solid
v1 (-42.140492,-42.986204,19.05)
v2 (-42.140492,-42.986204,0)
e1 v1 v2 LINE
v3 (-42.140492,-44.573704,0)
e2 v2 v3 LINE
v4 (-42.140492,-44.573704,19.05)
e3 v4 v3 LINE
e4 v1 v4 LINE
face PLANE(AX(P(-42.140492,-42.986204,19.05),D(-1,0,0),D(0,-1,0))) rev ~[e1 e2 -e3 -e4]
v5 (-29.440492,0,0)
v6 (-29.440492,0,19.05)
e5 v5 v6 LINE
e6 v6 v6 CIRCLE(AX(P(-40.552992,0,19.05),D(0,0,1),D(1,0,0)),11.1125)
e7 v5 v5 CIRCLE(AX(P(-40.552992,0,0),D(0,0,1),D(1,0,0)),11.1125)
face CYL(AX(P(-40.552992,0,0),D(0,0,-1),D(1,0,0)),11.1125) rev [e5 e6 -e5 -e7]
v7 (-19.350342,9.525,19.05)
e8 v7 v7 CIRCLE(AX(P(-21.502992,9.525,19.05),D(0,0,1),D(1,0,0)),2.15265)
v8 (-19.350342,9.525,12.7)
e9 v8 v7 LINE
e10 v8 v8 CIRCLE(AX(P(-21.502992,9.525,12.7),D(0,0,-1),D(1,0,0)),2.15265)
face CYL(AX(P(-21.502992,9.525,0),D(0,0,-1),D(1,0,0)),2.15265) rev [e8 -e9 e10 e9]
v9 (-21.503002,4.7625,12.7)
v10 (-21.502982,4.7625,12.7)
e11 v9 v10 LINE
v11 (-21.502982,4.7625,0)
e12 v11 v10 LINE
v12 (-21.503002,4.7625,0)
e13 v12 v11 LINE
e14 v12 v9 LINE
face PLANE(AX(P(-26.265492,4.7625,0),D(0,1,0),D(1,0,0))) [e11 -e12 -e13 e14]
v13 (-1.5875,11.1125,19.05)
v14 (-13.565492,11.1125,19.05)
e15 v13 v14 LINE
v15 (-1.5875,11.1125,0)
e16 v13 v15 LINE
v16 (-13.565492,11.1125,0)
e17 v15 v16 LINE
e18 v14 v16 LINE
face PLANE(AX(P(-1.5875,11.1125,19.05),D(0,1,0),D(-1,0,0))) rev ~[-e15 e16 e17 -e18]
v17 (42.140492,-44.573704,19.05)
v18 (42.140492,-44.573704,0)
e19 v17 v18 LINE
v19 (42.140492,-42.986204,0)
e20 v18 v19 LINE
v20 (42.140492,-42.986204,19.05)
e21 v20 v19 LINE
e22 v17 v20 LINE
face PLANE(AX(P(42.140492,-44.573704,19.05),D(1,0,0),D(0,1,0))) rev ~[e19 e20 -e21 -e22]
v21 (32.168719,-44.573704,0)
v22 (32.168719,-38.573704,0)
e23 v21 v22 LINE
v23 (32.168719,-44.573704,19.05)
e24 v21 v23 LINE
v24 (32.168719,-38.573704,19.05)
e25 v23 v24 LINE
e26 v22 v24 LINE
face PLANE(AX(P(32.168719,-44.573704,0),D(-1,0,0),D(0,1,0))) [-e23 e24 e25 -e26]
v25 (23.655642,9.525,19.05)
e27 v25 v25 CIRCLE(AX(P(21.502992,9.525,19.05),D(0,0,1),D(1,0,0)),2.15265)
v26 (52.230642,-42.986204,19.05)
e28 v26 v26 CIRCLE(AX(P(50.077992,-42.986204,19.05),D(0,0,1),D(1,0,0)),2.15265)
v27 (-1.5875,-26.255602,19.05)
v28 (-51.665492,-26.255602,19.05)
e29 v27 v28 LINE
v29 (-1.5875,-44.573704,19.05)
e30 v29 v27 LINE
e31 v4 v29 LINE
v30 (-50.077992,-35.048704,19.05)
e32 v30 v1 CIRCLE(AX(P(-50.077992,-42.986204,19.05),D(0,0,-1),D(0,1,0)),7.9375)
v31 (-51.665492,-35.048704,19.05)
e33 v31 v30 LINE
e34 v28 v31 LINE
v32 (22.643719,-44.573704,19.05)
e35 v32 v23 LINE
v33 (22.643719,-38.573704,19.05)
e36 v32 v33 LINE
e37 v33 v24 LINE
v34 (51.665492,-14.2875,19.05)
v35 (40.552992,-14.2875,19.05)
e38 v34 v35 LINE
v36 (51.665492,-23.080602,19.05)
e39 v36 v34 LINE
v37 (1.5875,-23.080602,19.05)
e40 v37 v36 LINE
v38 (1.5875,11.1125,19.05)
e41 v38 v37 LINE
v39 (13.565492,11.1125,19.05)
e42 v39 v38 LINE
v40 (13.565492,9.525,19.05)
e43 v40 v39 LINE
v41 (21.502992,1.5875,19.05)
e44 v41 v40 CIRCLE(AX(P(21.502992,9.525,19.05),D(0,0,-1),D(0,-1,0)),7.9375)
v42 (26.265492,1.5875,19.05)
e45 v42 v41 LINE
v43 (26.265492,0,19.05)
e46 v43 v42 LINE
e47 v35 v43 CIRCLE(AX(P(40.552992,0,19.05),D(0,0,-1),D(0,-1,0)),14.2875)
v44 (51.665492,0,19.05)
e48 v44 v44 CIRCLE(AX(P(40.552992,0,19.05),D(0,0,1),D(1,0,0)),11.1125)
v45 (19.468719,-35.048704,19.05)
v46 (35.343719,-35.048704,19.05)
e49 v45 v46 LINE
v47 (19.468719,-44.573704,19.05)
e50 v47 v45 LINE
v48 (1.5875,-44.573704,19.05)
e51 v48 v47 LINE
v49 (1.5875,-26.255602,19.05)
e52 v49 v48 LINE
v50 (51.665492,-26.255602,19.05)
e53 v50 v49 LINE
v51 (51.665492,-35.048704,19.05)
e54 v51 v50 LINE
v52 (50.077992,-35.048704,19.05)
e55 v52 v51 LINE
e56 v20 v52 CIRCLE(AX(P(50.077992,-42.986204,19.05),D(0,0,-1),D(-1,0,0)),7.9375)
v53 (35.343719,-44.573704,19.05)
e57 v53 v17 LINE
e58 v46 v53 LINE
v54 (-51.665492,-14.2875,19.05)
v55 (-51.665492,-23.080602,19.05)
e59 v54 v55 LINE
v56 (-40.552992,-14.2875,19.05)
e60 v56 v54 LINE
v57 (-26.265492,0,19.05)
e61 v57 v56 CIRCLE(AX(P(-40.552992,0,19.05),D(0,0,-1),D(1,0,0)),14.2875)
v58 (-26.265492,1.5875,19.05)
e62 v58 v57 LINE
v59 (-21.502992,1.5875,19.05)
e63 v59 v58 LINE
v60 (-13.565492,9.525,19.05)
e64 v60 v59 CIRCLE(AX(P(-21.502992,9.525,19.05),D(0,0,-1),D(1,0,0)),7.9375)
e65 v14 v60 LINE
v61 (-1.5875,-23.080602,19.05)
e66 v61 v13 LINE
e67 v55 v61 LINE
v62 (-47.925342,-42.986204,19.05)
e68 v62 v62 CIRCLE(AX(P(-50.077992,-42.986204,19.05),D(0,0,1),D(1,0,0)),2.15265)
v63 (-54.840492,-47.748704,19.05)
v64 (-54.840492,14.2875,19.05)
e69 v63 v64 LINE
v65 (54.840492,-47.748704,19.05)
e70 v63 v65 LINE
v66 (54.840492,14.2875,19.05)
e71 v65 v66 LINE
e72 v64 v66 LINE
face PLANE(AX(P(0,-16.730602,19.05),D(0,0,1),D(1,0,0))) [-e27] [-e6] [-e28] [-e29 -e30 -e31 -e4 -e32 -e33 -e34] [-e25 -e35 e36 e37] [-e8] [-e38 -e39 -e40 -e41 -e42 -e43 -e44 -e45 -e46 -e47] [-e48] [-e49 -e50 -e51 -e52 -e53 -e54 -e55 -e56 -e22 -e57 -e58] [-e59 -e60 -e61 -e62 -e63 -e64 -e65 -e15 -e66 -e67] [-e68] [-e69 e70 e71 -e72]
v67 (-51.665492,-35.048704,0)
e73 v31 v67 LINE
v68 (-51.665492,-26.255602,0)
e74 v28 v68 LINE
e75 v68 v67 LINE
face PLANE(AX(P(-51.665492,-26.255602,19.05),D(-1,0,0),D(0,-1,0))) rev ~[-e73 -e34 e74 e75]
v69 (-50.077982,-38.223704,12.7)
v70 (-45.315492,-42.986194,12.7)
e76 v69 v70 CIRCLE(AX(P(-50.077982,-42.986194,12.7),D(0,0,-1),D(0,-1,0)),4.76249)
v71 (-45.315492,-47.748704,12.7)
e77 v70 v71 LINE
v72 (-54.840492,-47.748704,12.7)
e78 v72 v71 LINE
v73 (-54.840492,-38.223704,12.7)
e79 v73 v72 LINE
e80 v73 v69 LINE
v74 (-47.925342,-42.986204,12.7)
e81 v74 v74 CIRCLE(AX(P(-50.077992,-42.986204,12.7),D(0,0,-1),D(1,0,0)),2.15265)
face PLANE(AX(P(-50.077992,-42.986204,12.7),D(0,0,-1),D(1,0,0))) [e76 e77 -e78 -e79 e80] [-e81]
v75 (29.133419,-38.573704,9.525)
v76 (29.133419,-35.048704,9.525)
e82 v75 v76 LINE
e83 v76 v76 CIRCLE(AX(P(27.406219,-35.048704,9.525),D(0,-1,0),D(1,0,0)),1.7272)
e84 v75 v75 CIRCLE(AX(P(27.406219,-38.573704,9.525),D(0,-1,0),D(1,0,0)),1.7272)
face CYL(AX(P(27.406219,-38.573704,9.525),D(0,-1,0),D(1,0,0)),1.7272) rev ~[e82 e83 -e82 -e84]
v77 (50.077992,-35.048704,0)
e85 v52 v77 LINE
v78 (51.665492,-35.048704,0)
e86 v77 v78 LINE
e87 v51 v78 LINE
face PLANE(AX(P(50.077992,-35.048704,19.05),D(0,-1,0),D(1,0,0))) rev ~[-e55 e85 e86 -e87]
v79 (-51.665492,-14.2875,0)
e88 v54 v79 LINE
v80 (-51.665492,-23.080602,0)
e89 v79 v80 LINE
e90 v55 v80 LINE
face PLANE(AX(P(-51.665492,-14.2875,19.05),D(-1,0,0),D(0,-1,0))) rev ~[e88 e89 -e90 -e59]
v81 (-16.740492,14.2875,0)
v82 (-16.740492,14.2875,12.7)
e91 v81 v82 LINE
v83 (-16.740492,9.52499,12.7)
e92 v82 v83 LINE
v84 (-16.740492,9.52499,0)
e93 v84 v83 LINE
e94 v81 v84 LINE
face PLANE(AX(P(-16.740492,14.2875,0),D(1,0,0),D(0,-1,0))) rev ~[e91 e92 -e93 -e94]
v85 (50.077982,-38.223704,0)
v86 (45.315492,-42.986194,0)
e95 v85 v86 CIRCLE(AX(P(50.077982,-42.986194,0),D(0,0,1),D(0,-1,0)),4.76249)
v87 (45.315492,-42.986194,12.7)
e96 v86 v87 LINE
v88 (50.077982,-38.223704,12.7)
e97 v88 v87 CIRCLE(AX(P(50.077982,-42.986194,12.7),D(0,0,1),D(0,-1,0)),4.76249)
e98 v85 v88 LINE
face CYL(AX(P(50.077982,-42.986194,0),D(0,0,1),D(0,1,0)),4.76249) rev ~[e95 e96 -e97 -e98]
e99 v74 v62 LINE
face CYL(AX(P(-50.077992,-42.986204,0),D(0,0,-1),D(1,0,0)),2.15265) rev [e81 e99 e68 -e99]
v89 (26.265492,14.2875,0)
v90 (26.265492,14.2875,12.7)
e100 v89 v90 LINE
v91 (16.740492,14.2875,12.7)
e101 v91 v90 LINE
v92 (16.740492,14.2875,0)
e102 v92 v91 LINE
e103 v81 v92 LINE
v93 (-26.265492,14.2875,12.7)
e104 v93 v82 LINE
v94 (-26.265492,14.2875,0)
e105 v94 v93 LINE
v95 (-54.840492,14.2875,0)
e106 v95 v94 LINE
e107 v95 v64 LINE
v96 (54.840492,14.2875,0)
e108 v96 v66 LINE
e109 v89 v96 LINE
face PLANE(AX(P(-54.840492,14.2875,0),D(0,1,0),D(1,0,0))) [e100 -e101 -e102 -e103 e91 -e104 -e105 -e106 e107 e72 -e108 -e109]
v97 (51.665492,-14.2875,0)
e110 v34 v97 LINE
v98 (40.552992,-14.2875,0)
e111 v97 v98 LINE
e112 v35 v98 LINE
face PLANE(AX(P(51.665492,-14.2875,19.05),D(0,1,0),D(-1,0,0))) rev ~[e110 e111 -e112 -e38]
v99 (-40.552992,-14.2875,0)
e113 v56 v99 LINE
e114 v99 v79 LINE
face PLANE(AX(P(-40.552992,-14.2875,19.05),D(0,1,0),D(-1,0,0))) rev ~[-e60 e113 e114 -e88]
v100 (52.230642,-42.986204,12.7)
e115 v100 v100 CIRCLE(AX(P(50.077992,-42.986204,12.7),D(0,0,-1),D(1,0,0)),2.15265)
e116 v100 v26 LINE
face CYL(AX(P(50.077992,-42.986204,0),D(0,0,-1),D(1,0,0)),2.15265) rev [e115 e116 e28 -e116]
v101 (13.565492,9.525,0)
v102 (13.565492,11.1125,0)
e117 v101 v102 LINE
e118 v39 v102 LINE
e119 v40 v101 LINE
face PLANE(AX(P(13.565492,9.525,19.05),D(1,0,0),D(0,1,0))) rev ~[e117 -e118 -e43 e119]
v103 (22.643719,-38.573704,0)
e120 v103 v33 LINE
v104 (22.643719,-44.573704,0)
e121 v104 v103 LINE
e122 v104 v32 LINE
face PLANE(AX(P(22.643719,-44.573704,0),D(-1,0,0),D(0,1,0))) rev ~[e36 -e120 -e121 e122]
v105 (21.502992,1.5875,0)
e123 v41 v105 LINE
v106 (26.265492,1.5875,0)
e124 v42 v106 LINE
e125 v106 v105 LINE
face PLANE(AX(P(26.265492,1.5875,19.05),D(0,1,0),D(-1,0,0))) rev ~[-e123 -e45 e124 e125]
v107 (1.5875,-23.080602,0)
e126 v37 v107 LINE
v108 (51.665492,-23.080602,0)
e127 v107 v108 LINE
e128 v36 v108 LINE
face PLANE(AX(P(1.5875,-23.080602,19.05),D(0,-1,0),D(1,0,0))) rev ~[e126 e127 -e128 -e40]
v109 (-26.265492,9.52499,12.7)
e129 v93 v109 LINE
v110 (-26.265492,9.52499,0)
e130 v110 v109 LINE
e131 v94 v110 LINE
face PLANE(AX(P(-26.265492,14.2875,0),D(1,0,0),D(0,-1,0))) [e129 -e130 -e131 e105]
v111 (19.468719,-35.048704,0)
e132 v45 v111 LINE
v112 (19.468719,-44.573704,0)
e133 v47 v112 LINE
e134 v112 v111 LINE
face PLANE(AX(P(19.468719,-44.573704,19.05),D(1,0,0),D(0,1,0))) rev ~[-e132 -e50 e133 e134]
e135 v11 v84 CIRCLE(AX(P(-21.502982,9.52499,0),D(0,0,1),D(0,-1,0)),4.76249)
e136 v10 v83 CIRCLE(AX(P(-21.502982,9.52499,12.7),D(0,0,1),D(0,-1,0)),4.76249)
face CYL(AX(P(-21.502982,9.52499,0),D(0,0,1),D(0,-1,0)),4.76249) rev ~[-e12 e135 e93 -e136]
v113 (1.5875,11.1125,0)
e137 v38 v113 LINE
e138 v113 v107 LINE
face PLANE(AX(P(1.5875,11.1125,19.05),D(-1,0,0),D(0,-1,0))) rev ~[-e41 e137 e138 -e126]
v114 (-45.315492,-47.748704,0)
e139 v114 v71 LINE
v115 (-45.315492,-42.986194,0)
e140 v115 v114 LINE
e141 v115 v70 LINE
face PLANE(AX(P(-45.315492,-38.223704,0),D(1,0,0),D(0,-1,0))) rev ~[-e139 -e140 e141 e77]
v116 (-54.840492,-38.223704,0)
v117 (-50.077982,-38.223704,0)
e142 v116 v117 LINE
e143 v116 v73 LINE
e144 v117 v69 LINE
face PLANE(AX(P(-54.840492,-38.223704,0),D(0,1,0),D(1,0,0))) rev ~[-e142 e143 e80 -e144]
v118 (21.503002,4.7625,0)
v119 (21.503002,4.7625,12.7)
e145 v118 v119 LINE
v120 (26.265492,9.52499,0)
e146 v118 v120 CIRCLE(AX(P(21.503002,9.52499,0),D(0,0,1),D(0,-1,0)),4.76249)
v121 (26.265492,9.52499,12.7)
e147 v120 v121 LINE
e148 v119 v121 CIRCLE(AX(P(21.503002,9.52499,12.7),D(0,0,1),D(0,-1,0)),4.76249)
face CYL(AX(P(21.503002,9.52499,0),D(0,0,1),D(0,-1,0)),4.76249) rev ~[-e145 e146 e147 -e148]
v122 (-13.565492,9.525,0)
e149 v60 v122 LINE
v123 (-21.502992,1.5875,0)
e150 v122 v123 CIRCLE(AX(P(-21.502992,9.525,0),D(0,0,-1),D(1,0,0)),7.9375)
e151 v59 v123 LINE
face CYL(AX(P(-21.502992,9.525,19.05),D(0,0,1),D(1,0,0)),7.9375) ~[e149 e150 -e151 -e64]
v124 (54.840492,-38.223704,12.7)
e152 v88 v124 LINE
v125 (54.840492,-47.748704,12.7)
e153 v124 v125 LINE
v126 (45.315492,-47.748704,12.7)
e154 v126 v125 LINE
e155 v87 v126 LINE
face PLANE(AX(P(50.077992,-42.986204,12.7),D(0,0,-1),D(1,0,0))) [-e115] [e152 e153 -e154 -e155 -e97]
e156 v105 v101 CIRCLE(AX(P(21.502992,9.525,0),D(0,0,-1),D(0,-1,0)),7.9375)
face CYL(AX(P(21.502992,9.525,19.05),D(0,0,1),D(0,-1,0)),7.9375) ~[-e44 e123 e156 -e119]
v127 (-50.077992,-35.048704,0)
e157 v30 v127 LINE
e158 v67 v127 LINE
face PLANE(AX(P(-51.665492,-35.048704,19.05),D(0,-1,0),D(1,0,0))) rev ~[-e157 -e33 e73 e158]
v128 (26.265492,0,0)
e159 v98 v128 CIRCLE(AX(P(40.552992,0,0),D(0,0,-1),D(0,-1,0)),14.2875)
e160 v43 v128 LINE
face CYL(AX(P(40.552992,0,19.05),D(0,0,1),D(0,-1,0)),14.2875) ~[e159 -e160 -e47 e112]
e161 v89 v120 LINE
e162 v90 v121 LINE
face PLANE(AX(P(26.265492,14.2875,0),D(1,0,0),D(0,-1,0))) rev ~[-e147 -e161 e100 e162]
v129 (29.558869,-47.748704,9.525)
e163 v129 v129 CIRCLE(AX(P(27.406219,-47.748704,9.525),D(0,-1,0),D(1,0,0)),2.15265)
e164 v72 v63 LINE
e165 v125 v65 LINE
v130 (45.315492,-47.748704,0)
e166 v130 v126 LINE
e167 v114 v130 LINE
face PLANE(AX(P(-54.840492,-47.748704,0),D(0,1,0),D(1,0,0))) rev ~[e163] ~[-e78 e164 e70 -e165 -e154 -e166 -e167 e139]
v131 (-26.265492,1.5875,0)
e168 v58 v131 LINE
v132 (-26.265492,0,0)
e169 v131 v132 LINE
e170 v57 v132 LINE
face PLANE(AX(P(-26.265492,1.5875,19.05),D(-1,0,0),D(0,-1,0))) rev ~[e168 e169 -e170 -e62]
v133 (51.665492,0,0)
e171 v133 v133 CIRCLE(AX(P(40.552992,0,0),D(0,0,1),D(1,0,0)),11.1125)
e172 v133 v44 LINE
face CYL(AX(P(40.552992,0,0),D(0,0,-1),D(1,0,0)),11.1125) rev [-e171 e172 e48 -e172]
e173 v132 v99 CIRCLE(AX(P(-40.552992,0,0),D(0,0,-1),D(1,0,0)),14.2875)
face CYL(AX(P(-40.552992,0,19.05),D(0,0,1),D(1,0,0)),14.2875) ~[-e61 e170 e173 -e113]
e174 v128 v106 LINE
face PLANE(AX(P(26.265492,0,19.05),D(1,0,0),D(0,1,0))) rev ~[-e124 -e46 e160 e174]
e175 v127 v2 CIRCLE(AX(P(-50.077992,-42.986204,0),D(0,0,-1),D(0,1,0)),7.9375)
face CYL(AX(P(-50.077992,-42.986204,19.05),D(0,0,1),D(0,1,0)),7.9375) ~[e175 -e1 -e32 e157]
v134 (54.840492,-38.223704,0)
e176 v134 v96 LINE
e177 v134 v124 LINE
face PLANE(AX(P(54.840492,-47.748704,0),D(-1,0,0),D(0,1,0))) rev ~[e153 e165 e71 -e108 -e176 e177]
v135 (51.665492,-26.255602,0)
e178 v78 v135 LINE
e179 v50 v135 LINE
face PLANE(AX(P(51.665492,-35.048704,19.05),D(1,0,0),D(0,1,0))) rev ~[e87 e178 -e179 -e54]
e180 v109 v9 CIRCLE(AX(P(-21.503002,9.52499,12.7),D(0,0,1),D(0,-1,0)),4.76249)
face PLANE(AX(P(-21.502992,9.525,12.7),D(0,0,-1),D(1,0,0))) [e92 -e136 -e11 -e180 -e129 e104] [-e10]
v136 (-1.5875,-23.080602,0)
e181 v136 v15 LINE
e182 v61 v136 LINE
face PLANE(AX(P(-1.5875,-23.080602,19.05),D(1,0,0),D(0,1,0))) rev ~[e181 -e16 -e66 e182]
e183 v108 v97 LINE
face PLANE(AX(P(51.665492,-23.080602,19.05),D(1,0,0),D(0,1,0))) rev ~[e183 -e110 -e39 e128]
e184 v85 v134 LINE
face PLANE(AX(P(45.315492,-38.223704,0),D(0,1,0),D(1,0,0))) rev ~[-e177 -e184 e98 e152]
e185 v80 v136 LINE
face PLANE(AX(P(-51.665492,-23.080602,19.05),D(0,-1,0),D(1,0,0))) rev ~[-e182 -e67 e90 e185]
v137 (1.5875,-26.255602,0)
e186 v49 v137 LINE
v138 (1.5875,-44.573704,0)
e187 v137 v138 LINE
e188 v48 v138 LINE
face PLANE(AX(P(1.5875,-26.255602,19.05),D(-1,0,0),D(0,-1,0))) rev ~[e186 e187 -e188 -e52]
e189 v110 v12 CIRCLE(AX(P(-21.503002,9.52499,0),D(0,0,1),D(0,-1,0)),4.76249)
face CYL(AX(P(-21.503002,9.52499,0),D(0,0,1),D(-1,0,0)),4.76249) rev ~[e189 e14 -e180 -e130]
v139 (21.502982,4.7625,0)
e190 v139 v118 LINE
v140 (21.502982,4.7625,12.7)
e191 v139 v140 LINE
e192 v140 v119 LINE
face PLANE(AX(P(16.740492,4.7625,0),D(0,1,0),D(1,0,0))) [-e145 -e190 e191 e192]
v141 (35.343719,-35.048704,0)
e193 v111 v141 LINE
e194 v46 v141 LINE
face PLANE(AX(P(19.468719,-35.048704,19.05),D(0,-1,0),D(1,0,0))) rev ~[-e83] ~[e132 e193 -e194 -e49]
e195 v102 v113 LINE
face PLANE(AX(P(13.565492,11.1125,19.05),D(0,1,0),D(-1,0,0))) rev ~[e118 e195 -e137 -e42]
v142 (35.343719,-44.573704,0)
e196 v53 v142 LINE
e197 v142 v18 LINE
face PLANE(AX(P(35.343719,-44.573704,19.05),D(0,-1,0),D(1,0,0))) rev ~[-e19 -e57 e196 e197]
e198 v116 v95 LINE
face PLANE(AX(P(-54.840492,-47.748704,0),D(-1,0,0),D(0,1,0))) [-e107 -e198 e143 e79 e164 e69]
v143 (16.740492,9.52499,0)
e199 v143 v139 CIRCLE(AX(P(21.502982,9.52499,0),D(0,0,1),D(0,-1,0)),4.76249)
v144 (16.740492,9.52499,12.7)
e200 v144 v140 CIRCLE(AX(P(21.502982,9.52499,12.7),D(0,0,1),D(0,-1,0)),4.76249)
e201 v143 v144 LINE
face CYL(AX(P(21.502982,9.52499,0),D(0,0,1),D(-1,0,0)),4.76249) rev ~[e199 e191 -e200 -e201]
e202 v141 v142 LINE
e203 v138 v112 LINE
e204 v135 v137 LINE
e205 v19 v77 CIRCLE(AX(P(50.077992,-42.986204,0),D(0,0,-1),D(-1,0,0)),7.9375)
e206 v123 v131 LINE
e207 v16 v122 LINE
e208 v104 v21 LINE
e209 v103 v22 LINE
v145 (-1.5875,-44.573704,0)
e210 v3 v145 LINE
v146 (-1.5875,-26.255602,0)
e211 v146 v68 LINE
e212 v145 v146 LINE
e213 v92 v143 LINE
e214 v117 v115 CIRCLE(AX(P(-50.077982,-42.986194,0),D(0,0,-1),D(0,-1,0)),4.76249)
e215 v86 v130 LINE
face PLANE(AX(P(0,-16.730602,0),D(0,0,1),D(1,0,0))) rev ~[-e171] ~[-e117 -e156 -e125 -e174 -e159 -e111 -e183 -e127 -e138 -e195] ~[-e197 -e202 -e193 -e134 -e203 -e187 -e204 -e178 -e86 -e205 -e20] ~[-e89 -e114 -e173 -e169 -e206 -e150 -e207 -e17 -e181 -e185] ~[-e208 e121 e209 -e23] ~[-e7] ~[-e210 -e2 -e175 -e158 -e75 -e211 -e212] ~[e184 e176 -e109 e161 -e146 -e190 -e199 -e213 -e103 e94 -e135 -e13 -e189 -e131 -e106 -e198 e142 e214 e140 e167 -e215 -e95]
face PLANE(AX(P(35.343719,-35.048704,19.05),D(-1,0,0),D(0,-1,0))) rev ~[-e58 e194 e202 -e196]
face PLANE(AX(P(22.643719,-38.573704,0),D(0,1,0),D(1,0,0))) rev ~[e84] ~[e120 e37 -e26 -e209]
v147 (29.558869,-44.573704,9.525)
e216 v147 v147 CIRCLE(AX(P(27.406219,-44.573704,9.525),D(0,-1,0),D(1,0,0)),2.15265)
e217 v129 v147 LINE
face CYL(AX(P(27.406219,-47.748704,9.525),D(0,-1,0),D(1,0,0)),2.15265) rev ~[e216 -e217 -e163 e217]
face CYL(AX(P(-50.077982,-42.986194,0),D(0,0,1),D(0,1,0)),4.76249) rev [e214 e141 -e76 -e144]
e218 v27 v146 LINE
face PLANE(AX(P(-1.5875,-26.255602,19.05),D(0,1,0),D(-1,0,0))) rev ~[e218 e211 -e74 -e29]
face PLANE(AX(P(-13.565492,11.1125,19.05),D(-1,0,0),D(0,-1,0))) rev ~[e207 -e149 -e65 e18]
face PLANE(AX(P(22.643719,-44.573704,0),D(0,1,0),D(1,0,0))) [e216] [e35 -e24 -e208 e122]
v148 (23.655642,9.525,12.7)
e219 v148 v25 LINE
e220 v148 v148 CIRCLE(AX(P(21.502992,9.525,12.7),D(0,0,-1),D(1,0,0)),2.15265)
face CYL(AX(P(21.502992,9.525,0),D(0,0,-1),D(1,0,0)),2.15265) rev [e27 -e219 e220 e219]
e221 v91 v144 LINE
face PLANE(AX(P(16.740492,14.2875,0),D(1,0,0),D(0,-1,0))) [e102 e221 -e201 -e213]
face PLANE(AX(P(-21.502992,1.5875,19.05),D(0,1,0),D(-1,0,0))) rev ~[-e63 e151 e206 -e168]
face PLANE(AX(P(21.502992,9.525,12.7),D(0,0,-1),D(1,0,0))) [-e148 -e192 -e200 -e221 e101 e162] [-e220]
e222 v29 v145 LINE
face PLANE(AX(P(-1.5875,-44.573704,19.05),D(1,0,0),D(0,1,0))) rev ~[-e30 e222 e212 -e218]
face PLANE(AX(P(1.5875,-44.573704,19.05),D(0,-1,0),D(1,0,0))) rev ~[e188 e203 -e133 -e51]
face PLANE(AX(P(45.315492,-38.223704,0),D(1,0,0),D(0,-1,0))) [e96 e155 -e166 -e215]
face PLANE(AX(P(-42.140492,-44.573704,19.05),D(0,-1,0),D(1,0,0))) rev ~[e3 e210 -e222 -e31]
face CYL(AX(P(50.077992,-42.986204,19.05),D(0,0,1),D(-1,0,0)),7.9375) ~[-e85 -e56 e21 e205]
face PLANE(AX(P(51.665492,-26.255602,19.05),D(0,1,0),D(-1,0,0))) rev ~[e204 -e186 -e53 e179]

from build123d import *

# Parameters (mm, degrees)
F0_W      = 109.6809846
F0_H      = 62.036204
F0_R      = 2.15265
F0_W_2    = 9.525
F0_H_2    = 6
F0_R_2    = 11.1125
F1_DEPTH  = 19.05
F2_W      = 9.525
F2_H      = 9.525
F3_DEPTH  = 12.7
F4_R      = 4.76249
F6_DEPTH  = 19.05
F7_R      = 2.15265
F8_DEPTH  = 3.175
F9_R      = 1.7272
F10_DEPTH = 3.525


# Not quite as in the source:
# - a fillet or chamfer is up to 0.001 mm smaller than in the source, because OpenCascade refuses the exact size


with BuildPart() as f1:
    # F0 (on Top) → F1 (new body)
    with BuildSketch(Plane.XY):
        with Locations((0, -16.730602)):
            Rectangle(F0_W, F0_H)
        with Locations((-50.0779923, -42.986204)):
            Circle(F0_R, mode=Mode.SUBTRACT)
        with Locations((27.406219, -41.573704)):
            Rectangle(F0_W_2, F0_H_2, mode=Mode.SUBTRACT)
        with Locations((50.0779923, -42.986204)):
            Circle(F0_R, mode=Mode.SUBTRACT)
        with Locations((-40.5529923, 0)):
            Circle(F0_R_2, mode=Mode.SUBTRACT)
        with Locations((-21.5029923, 9.525)):
            Circle(F0_R, mode=Mode.SUBTRACT)
        with Locations((21.5029923, 9.525)):
            Circle(F0_R, mode=Mode.SUBTRACT)
        with Locations((40.5529923, 0)):
            Circle(F0_R_2, mode=Mode.SUBTRACT)
    extrude(amount=F1_DEPTH)

    # F2 (on face) → F3 (cut)
    with BuildSketch(Plane(origin=(0, 0, 0), x_dir=(1, 0, 0), z_dir=(0, 0, -1))):
        with Locations((-21.5029923, -9.525)):
            Rectangle(F2_W, F2_H)
        with Locations((21.5029923, -9.525)):
            Rectangle(F2_W, F2_H)
        with Locations((50.0779923, 42.986204)):
            Rectangle(F2_W, F2_H)
        with Locations((-50.0779923, 42.986204)):
            Rectangle(F2_W, F2_H)
    extrude(amount=-F3_DEPTH, mode=Mode.SUBTRACT)

    # F4 (radius 4.7625 in the source; OpenCascade refuses exactly that, so slightly less here)
    f4_edges = [f1.edges().sort_by_distance(p)[0] for p in [
        (-45.315492, -38.223704, 6.35),
        (45.315492, -38.223704, 6.35),
        (26.265492, 4.7625, 6.35),
        (16.740492, 4.7625, 6.35),
        (-26.265492, 4.7625, 6.35),
        (-16.740492, 4.7625, 6.35),
    ]]
    fillet(f4_edges, radius=F4_R)

    # F5 (on face) → F6 (cut, through all)
    with BuildSketch(Plane.XY.offset(19.05)):
        with BuildLine():
            Line((-51.6654923, -23.080602), (-1.5875, -23.080602))
            Line((-1.5875, -23.080602), (-1.5875, 11.1125))
            Line((-1.5875, 11.1125), (-13.5654923, 11.1125))
            Line((-13.5654923, 11.1125), (-13.5654923, 9.525))
            ThreePointArc((-13.5654923, 9.525), (-15.8903322243, 3.9123399243), (-21.5029923, 1.5875))
            Line((-21.5029923, 1.5875), (-26.2654923, 1.5875))
            Line((-26.2654923, 1.5875), (-26.2654923, 0))
            ThreePointArc((-26.2654923, 0), (-30.4502041638, -10.1027881362), (-40.5529923, -14.2875))
            Line((-40.5529923, -14.2875), (-51.6654923, -14.2875))
            Line((-51.6654923, -14.2875), (-51.6654923, -23.080602))
        make_face()
        with BuildLine():
            Line((-1.5875, -44.573704), (-1.5875, -26.255602))
            Line((-1.5875, -26.255602), (-51.6654923, -26.255602))
            Line((-51.6654923, -26.255602), (-51.6654923, -35.048704))
            Line((-51.6654923, -35.048704), (-50.0779923, -35.048704))
            ThreePointArc((-50.0779923, -35.048704), (-44.4653322243, -37.3735439243), (-42.1404923, -42.986204))
            Line((-42.1404923, -42.986204), (-42.1404923, -44.573704))
            Line((-42.1404923, -44.573704), (-1.5875, -44.573704))
        make_face()
        with BuildLine():
            Line((1.5875, -23.080602), (51.6654923, -23.080602))
            Line((51.6654923, -23.080602), (51.6654923, -14.2875))
            Line((51.6654923, -14.2875), (40.5529923, -14.2875))
            ThreePointArc((40.5529923, -14.2875), (30.4502041638, -10.1027881362), (26.2654923, 0))
            Line((26.2654923, 0), (26.2654923, 1.5875))
            Line((26.2654923, 1.5875), (21.5029923, 1.5875))
            ThreePointArc((21.5029923, 1.5875), (15.8903322243, 3.9123399243), (13.5654923, 9.525))
            Line((13.5654923, 9.525), (13.5654923, 11.1125))
            Line((13.5654923, 11.1125), (1.5875, 11.1125))
            Line((1.5875, 11.1125), (1.5875, -23.080602))
        make_face()
        with BuildLine():
            Line((51.6654923, -26.255602), (1.5875, -26.255602))
            Line((1.5875, -26.255602), (1.5875, -44.573704))
            Line((1.5875, -44.573704), (19.468719, -44.573704))
            Line((19.468719, -44.573704), (19.468719, -35.048704))
            Line((19.468719, -35.048704), (35.343719, -35.048704))
            Line((35.343719, -35.048704), (35.343719, -44.573704))
            Line((35.343719, -44.573704), (42.1404923, -44.573704))
            Line((42.1404923, -44.573704), (42.1404923, -42.986204))
            ThreePointArc((42.1404923, -42.986204), (44.4653322243, -37.3735439243), (50.0779923, -35.048704))
            Line((50.0779923, -35.048704), (51.6654923, -35.048704))
            Line((51.6654923, -35.048704), (51.6654923, -26.255602))
        make_face()
    extrude(amount=-F6_DEPTH, mode=Mode.SUBTRACT)

    # F7 (on face) → F8 (cut, through all)
    with BuildSketch(Plane.XZ.offset(47.748704)):
        with Locations((27.406219, 9.525)):
            Circle(F7_R)
    extrude(amount=-F8_DEPTH, mode=Mode.SUBTRACT)

    # F9 (on face) → F10 (cut, through all)
    with BuildSketch(Plane.XZ.offset(38.573704)):
        with Locations((27.406219, 9.525)):
            Circle(F9_R)
    extrude(amount=-F10_DEPTH, mode=Mode.SUBTRACT)


solid = f1.part
